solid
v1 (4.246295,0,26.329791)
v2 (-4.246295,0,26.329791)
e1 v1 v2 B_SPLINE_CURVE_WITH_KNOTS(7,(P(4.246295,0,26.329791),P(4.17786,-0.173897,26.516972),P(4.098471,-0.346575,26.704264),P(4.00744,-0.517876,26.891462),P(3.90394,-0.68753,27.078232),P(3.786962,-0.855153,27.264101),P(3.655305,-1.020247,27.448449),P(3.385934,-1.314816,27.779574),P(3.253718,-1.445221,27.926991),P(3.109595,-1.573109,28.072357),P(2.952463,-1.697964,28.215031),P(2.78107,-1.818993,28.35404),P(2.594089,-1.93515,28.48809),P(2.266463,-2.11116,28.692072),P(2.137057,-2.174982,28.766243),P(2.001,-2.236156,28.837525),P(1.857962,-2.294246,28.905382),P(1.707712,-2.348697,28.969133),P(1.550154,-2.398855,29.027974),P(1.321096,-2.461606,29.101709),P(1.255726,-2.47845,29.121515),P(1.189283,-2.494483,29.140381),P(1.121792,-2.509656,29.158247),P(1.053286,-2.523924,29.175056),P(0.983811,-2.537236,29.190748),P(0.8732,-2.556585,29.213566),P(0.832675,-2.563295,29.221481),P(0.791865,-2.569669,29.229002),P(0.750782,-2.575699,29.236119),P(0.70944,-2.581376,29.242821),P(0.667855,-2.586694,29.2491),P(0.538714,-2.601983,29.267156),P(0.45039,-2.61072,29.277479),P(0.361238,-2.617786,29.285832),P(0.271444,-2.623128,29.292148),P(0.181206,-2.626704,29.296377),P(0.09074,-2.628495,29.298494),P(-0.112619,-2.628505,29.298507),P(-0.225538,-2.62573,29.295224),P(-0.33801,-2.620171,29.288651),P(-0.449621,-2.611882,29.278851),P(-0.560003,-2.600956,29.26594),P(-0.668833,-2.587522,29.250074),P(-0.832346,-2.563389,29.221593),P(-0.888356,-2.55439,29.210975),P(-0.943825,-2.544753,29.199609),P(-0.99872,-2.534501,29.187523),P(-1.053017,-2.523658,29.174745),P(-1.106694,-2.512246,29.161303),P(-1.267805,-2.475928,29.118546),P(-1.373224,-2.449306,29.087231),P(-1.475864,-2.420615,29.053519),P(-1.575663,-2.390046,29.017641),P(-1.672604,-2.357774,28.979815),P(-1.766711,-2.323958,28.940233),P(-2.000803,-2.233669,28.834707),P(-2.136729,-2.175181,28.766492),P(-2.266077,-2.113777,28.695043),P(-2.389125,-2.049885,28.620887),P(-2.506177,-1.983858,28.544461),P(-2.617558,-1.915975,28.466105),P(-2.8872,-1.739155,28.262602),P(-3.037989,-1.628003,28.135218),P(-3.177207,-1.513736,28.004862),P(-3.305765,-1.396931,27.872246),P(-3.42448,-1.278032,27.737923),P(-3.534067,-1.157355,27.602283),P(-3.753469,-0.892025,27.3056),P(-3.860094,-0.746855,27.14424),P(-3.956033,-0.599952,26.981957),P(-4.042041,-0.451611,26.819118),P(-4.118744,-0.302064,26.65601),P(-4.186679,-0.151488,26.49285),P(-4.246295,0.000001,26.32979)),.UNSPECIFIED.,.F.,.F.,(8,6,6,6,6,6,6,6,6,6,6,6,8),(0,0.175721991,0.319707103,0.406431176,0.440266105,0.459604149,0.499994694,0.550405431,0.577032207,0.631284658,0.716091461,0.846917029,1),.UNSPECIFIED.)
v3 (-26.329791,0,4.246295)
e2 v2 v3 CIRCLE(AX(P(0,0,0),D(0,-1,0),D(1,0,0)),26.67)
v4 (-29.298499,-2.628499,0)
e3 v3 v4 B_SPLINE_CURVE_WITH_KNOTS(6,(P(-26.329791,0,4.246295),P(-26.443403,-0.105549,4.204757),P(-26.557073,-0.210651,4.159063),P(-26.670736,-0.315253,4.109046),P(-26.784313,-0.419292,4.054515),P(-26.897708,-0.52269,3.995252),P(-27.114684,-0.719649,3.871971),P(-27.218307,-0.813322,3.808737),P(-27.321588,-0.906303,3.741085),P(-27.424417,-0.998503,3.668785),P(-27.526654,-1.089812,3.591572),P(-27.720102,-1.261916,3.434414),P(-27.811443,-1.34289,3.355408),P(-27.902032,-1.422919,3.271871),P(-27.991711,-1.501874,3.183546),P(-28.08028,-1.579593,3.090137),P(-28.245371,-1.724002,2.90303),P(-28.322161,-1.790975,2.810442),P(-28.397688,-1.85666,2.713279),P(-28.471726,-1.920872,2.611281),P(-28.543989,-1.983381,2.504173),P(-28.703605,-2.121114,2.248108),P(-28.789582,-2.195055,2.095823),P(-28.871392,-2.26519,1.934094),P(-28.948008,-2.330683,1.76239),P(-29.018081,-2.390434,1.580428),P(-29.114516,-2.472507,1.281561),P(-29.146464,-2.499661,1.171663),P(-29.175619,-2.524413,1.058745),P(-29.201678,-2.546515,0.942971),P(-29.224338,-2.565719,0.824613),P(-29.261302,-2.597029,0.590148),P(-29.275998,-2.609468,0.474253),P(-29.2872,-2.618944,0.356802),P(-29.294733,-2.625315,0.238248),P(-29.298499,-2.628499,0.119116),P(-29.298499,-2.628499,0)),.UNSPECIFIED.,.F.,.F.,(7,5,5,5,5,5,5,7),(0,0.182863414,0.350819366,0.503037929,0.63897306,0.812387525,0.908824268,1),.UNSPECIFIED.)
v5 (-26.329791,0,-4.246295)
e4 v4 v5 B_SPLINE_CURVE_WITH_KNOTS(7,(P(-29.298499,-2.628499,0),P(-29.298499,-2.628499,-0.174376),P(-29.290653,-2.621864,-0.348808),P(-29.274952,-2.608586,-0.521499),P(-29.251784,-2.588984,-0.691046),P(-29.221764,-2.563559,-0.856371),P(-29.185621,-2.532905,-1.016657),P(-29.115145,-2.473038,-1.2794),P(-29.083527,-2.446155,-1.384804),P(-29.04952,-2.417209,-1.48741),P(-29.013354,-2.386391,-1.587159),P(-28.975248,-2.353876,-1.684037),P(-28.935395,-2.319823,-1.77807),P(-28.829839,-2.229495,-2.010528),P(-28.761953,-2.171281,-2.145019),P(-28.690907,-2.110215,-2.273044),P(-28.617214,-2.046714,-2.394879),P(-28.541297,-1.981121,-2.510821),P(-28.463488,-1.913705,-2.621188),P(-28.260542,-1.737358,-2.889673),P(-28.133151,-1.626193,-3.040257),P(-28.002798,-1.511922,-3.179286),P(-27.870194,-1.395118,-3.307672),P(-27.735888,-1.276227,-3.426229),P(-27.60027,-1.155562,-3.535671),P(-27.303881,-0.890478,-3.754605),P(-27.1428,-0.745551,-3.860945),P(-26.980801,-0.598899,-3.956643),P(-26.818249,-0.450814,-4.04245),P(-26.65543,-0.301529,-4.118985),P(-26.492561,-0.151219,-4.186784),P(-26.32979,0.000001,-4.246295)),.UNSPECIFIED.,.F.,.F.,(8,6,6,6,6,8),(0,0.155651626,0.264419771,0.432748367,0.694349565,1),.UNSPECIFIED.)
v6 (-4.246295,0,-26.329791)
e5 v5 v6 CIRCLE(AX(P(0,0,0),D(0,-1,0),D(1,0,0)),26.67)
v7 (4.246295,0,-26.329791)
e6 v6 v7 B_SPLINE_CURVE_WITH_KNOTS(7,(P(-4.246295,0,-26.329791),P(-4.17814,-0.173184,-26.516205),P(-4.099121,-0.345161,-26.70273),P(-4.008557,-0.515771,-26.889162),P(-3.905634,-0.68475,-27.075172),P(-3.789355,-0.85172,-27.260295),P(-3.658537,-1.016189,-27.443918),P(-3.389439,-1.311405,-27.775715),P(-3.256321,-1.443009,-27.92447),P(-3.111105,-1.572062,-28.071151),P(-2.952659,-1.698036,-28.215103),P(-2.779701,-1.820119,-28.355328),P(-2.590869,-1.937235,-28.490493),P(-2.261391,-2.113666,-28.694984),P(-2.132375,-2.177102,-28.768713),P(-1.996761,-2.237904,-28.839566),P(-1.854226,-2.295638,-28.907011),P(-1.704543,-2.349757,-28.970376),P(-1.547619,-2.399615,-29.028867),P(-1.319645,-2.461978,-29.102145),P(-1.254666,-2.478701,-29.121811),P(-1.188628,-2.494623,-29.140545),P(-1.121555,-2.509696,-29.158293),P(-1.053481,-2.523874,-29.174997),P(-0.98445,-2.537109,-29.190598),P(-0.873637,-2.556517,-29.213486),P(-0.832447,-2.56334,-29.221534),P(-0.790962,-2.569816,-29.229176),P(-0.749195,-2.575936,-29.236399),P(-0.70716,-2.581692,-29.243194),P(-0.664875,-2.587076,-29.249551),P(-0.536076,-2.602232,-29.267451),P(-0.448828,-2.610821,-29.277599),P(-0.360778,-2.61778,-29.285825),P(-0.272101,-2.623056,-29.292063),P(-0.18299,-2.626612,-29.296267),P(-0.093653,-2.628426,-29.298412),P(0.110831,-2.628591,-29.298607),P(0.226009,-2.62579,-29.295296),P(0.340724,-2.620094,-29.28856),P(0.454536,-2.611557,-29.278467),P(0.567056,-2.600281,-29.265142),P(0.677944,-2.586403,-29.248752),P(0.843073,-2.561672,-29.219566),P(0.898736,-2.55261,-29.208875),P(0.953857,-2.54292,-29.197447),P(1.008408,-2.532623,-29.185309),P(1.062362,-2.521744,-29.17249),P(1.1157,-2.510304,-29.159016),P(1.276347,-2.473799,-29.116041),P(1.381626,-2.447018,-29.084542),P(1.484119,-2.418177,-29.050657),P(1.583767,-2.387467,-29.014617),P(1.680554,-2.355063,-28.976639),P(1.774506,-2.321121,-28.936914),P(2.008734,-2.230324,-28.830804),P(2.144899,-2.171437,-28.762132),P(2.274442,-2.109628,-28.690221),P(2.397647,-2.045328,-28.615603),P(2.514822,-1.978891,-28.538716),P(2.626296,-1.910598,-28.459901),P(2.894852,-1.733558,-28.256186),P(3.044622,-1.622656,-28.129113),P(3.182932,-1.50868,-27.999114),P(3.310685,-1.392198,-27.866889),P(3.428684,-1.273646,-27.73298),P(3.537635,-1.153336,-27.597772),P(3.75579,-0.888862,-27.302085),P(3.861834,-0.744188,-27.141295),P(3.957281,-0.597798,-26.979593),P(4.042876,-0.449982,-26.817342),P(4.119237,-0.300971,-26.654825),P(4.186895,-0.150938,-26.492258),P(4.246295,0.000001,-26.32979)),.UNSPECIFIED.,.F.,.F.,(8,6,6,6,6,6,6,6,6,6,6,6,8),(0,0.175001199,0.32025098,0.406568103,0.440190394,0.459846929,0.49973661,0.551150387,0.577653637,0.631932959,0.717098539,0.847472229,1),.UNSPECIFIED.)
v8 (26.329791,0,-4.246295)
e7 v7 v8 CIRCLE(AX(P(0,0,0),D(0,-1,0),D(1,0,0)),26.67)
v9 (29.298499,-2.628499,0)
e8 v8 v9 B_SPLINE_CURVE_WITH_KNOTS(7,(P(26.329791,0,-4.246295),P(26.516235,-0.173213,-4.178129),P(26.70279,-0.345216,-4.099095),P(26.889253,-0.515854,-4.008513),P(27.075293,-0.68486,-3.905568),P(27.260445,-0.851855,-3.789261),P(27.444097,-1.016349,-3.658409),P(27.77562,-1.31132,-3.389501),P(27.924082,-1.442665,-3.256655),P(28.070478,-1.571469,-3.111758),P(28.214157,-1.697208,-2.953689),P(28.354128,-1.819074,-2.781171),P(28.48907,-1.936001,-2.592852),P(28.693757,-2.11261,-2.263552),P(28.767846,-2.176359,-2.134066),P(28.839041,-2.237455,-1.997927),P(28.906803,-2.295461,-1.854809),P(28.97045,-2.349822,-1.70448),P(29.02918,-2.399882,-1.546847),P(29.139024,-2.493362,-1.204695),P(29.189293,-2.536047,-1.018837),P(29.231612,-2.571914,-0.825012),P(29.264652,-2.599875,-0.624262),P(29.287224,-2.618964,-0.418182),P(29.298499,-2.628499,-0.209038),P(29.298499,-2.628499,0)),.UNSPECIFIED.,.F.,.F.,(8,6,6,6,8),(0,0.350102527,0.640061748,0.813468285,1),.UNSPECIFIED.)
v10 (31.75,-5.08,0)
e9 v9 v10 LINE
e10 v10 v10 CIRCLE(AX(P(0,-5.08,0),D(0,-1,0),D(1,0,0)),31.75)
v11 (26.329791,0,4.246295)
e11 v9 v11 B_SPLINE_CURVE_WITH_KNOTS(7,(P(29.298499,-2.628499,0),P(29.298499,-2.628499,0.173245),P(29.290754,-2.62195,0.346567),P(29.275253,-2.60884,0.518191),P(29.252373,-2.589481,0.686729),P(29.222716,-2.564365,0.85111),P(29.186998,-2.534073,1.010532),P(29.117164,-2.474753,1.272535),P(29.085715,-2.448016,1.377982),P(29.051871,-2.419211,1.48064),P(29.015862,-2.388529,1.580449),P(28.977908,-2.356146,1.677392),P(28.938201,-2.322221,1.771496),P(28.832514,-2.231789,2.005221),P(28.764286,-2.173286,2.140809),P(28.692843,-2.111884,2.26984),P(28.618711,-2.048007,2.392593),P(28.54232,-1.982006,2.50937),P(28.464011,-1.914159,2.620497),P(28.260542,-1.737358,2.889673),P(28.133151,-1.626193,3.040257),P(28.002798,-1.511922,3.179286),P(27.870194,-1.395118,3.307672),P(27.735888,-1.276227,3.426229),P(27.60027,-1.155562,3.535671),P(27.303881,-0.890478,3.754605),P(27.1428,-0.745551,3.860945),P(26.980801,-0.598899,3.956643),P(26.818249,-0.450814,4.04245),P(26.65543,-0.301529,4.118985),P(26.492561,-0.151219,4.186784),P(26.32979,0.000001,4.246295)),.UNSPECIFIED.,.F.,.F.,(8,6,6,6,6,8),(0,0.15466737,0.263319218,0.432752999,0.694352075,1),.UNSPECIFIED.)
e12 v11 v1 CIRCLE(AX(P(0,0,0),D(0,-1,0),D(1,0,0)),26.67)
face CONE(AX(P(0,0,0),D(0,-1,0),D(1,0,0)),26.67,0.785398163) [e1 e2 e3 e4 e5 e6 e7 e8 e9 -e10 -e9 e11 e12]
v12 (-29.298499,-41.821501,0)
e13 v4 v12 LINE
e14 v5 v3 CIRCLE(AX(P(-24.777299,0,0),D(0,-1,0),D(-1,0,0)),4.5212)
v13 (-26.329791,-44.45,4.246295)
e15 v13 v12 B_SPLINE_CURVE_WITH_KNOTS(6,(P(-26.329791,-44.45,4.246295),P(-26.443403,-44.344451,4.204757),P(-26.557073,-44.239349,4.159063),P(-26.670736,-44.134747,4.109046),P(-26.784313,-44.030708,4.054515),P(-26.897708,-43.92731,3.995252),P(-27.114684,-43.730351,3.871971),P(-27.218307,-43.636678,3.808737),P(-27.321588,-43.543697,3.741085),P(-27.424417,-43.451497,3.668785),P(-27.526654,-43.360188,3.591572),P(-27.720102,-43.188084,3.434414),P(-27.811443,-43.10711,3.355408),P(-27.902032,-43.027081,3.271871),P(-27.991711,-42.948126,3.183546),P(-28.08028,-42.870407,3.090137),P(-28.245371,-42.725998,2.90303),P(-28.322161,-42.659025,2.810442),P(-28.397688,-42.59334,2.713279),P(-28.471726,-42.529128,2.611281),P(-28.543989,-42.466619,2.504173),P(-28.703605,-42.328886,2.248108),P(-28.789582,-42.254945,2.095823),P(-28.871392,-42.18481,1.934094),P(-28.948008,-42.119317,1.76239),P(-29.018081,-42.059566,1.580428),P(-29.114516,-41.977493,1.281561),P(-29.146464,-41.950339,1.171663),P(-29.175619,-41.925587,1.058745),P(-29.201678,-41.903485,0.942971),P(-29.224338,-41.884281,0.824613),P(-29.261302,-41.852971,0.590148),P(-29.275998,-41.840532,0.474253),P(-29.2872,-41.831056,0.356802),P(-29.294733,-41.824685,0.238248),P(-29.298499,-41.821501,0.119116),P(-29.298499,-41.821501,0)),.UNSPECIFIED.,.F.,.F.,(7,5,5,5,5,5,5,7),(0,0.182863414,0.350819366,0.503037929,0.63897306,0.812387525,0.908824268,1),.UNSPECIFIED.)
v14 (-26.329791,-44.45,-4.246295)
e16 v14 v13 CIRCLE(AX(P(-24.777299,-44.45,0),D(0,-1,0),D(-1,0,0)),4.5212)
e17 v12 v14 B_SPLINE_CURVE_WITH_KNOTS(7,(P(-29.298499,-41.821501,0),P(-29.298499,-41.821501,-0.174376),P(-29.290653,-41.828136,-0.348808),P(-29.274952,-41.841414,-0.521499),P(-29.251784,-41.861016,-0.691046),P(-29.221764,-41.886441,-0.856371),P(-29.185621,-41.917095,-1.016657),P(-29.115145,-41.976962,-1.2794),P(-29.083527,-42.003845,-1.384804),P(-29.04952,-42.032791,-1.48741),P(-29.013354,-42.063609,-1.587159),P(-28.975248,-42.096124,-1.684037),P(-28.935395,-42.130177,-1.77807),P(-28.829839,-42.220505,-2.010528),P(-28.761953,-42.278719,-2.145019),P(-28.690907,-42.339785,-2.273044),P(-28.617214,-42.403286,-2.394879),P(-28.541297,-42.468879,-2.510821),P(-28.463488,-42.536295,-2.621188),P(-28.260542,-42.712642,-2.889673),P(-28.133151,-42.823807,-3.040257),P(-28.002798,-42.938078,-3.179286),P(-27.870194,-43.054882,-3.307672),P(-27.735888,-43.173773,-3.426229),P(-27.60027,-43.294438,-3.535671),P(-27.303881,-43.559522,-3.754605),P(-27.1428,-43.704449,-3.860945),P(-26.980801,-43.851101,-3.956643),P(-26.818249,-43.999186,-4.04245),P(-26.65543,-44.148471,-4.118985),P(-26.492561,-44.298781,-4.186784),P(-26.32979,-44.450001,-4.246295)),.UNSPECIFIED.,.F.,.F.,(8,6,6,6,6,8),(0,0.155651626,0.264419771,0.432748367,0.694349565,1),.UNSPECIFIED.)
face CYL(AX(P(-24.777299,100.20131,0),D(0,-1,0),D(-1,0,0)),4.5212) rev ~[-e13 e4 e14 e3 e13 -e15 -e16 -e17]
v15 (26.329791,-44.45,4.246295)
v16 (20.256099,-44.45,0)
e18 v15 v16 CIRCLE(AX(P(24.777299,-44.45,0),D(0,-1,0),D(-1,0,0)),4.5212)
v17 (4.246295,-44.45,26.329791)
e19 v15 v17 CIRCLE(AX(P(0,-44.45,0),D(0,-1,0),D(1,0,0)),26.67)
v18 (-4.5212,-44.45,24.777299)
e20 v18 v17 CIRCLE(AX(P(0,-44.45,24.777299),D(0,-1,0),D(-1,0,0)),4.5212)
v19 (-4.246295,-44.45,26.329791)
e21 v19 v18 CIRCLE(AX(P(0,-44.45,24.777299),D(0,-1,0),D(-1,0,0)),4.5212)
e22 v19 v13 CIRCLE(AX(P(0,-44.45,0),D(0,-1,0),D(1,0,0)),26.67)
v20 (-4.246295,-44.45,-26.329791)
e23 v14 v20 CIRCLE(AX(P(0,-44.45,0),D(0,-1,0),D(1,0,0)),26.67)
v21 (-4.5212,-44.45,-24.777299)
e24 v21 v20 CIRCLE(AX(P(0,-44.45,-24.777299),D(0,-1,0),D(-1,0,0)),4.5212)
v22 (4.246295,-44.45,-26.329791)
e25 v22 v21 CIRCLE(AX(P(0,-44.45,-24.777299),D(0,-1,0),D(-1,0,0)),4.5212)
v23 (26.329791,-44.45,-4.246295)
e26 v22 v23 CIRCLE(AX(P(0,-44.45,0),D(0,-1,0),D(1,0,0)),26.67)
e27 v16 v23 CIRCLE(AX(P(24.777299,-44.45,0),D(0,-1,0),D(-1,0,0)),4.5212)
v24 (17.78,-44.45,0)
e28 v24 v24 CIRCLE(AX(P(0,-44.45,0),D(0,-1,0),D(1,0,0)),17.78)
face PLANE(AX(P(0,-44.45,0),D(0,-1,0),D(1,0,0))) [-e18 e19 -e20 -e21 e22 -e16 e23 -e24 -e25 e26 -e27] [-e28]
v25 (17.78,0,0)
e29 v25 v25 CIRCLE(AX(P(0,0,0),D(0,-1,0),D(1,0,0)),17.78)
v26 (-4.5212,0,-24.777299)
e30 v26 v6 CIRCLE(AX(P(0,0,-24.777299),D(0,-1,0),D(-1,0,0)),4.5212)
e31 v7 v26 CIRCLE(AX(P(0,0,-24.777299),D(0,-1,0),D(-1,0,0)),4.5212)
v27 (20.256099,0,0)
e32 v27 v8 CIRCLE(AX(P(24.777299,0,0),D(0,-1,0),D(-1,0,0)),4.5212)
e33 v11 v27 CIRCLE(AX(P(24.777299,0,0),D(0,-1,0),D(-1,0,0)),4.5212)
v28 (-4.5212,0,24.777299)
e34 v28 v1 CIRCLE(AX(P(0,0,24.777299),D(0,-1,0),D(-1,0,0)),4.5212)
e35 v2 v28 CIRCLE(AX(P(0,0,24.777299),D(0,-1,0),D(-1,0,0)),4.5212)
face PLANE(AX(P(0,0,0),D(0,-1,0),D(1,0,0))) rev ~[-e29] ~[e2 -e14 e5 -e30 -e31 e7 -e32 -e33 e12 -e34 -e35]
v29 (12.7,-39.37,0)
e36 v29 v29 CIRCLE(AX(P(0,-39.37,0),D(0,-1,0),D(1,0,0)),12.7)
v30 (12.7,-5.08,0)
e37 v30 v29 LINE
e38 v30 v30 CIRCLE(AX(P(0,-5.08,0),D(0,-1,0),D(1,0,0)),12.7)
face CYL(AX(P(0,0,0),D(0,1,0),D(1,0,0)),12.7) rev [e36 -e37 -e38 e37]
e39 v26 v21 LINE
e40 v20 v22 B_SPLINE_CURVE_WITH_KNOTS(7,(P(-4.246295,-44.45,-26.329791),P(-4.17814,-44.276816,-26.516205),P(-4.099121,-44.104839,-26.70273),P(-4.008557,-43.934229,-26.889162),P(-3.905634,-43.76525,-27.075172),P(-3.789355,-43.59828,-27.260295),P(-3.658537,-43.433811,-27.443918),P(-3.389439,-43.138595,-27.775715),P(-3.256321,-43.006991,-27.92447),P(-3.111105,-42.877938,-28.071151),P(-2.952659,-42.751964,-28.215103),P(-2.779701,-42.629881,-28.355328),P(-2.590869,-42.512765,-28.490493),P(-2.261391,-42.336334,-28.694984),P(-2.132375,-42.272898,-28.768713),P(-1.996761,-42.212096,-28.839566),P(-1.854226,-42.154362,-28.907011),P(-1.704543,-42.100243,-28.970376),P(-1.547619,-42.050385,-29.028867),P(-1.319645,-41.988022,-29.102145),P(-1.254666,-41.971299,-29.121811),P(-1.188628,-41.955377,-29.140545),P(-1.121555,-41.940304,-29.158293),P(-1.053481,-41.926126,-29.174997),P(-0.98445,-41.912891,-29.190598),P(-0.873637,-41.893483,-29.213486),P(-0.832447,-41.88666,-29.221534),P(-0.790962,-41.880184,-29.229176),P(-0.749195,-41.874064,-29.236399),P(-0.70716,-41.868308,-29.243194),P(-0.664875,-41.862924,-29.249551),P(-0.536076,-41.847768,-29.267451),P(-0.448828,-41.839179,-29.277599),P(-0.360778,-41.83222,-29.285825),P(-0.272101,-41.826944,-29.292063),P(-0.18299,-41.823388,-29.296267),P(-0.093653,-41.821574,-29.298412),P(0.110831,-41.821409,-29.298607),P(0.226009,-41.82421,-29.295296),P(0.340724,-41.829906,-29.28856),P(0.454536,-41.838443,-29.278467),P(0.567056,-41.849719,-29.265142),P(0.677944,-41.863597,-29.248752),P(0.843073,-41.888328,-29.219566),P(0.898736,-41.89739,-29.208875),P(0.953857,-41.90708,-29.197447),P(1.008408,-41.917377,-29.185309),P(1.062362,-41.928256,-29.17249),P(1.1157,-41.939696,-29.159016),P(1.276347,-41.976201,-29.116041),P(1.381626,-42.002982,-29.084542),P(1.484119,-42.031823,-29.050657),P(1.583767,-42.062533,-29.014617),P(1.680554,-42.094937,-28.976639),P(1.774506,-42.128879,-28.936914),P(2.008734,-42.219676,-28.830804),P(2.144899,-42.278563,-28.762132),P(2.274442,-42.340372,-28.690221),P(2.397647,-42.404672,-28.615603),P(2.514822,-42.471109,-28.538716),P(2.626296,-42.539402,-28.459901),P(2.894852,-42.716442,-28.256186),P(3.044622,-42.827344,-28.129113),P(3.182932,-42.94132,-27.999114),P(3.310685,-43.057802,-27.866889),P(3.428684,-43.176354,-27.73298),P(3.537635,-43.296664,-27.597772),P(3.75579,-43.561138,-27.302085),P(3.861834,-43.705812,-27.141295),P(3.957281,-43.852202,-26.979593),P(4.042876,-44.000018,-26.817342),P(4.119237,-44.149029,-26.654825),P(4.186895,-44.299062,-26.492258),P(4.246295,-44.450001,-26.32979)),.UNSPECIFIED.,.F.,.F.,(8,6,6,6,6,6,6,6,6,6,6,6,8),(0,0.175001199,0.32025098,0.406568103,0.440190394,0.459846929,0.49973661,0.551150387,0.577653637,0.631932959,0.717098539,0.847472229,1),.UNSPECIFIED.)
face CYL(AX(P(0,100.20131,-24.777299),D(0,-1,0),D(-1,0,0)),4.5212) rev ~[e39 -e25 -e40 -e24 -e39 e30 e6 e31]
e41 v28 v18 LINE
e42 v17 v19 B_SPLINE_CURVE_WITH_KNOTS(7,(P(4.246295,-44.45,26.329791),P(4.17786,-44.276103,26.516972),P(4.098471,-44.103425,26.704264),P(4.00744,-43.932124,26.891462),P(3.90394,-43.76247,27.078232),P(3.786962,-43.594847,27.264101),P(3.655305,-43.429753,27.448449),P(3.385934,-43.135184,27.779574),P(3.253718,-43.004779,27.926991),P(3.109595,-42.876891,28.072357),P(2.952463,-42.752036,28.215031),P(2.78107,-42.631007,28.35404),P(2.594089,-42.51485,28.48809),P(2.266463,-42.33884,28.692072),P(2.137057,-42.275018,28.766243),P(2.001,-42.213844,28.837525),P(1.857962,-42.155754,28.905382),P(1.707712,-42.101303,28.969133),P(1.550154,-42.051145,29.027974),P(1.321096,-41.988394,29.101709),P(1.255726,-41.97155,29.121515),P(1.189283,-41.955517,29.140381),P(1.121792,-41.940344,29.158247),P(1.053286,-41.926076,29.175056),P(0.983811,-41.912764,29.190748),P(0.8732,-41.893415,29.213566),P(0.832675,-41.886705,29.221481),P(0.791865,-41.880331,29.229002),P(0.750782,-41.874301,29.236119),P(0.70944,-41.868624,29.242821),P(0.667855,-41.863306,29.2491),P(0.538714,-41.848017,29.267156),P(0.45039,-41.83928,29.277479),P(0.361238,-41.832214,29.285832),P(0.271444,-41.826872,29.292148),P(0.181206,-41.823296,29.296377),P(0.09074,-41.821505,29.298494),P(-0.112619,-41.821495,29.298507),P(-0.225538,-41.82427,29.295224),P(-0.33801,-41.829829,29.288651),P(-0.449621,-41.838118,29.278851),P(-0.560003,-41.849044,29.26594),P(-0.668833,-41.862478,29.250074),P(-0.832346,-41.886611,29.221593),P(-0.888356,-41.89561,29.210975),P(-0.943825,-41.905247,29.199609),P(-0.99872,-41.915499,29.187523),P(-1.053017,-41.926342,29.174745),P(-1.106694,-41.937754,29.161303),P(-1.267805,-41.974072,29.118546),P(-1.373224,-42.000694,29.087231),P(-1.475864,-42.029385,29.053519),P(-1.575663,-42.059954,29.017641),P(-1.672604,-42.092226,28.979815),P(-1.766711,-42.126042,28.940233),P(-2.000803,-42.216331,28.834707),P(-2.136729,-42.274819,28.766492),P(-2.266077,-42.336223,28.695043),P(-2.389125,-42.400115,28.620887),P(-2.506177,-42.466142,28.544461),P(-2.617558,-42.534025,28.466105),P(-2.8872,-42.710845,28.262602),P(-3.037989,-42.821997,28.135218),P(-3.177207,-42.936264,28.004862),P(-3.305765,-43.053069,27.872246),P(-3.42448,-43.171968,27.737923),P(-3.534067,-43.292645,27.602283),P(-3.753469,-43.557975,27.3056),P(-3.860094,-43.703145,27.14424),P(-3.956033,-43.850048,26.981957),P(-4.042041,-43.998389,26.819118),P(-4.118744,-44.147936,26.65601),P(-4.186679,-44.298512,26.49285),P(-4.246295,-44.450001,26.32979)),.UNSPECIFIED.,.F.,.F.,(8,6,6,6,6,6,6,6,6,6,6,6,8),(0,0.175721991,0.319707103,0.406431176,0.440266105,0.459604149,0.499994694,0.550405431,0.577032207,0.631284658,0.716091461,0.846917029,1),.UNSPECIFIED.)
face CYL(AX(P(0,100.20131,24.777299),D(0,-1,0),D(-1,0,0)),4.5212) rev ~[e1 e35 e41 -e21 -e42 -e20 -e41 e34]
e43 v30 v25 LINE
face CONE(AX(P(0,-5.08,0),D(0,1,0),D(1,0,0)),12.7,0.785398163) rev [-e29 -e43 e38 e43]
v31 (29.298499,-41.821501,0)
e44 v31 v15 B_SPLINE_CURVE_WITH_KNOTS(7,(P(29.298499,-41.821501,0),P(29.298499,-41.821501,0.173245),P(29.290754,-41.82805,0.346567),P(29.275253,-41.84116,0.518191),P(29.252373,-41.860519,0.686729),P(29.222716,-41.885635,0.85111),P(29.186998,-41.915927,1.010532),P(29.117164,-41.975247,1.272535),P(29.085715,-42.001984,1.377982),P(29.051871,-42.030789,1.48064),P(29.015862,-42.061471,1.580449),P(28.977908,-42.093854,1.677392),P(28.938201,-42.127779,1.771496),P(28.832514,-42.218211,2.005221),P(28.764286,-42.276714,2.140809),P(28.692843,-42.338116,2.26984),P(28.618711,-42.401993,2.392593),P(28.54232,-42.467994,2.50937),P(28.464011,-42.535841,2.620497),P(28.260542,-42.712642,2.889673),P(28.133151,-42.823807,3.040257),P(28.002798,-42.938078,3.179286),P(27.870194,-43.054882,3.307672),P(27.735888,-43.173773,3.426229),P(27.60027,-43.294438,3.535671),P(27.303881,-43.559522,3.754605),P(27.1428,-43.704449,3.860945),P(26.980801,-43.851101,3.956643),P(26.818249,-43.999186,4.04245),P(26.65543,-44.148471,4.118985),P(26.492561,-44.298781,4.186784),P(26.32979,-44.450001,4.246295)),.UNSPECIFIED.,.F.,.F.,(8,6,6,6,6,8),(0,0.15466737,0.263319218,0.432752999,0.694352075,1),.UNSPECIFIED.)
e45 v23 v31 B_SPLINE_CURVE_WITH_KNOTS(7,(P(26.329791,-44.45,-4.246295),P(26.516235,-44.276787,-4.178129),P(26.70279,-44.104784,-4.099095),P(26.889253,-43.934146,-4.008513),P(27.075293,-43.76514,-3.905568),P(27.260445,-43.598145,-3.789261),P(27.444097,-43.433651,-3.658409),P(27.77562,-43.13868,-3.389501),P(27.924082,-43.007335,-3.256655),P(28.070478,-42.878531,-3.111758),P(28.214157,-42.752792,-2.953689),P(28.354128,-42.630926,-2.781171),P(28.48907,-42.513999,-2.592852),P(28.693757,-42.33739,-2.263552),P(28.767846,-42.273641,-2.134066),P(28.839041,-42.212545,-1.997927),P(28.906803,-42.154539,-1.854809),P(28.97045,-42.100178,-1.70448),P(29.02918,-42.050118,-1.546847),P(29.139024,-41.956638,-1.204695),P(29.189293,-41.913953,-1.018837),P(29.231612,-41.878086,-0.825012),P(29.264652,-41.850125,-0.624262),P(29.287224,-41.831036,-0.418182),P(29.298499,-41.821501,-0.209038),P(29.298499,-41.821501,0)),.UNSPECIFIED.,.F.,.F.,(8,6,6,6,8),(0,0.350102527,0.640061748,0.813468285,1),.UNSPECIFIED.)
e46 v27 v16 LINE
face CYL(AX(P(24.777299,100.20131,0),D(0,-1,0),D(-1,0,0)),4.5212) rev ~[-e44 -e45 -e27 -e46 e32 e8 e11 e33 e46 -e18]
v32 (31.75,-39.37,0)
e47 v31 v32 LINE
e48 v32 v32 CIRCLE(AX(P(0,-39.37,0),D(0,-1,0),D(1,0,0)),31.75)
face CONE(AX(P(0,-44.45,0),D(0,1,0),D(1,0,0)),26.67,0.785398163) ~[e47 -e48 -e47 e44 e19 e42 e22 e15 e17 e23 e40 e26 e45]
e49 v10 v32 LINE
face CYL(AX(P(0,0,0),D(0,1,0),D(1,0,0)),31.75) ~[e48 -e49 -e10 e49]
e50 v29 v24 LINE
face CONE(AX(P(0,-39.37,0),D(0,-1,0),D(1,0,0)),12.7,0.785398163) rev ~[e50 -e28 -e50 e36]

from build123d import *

# Parameters (mm, degrees)
F0_R     = 31.75
F0_R_2   = 24.7772994978
F0_R_3   = 19.1989713068
F0_R_4   = 12.7
F1_DEPTH = 44.45
F2_D     = 9.0424


# Not quite as in the source:
# - a fillet or chamfer that OpenCascade refuses, or shapes differently, is made with other operations: its cross-section is extruded or revolved along the edge and cut away or added


with BuildPart() as f1:
    # F0 (on Front) → F1 (new body)
    with BuildSketch(Plane.XZ):
        Circle(F0_R)
        Circle(F0_R_2, mode=Mode.SUBTRACT)
        Circle(F0_R_2)
        Circle(F0_R_3, mode=Mode.SUBTRACT)
        Circle(F0_R_3)
        Circle(F0_R_4, mode=Mode.SUBTRACT)
    extrude(amount=F1_DEPTH)

    # F2 (through all)
    with Locations(Plane(origin=(0, 0, 0), x_dir=(1, 0, 0), z_dir=(0, 1, 0))):
        with Locations((24.7772994978, 0), (0, 24.7772994978), (-24.7772994978, 0), (0, -24.7772994978)):
            Hole(F2_D / 2)

    # F3: chamfer of 5.08 on 4 edges, made by hand

    # F3_s1 → F3_t2 (revolve, cut)
    with BuildSketch(Plane.XY):
        Polygon((12.7, -39.37), (17.78, -44.45), (12.7, -44.45), align=None)
    revolve(axis=Axis((0, -44.45, 0), (0, -1, 0)), mode=Mode.SUBTRACT)

    # F3_s3 → F3_t4 (revolve, cut)
    with BuildSketch(Plane.XY):
        Polygon((26.67, -44.45), (31.75, -39.37), (31.75, -44.45), align=None)
    revolve(axis=Axis((0, -44.45, 0), (0, -1, 0)), mode=Mode.SUBTRACT)

    # F3_s5 → F3_t6 (revolve, cut)
    with BuildSketch(Plane.XY):
        Polygon((12.7, -5.08), (17.78, 0), (12.7, 0), align=None)
    revolve(axis=Axis((0, 0, 0), (0, -1, 0)), mode=Mode.SUBTRACT)

    # F3_s7 → F3_t8 (revolve, cut)
    with BuildSketch(Plane.XY):
        Polygon((26.67, 0), (31.75, -5.08), (31.75, 0), align=None)
    revolve(axis=Axis((0, 0, 0), (0, -1, 0)), mode=Mode.SUBTRACT)


solid = f1.part
